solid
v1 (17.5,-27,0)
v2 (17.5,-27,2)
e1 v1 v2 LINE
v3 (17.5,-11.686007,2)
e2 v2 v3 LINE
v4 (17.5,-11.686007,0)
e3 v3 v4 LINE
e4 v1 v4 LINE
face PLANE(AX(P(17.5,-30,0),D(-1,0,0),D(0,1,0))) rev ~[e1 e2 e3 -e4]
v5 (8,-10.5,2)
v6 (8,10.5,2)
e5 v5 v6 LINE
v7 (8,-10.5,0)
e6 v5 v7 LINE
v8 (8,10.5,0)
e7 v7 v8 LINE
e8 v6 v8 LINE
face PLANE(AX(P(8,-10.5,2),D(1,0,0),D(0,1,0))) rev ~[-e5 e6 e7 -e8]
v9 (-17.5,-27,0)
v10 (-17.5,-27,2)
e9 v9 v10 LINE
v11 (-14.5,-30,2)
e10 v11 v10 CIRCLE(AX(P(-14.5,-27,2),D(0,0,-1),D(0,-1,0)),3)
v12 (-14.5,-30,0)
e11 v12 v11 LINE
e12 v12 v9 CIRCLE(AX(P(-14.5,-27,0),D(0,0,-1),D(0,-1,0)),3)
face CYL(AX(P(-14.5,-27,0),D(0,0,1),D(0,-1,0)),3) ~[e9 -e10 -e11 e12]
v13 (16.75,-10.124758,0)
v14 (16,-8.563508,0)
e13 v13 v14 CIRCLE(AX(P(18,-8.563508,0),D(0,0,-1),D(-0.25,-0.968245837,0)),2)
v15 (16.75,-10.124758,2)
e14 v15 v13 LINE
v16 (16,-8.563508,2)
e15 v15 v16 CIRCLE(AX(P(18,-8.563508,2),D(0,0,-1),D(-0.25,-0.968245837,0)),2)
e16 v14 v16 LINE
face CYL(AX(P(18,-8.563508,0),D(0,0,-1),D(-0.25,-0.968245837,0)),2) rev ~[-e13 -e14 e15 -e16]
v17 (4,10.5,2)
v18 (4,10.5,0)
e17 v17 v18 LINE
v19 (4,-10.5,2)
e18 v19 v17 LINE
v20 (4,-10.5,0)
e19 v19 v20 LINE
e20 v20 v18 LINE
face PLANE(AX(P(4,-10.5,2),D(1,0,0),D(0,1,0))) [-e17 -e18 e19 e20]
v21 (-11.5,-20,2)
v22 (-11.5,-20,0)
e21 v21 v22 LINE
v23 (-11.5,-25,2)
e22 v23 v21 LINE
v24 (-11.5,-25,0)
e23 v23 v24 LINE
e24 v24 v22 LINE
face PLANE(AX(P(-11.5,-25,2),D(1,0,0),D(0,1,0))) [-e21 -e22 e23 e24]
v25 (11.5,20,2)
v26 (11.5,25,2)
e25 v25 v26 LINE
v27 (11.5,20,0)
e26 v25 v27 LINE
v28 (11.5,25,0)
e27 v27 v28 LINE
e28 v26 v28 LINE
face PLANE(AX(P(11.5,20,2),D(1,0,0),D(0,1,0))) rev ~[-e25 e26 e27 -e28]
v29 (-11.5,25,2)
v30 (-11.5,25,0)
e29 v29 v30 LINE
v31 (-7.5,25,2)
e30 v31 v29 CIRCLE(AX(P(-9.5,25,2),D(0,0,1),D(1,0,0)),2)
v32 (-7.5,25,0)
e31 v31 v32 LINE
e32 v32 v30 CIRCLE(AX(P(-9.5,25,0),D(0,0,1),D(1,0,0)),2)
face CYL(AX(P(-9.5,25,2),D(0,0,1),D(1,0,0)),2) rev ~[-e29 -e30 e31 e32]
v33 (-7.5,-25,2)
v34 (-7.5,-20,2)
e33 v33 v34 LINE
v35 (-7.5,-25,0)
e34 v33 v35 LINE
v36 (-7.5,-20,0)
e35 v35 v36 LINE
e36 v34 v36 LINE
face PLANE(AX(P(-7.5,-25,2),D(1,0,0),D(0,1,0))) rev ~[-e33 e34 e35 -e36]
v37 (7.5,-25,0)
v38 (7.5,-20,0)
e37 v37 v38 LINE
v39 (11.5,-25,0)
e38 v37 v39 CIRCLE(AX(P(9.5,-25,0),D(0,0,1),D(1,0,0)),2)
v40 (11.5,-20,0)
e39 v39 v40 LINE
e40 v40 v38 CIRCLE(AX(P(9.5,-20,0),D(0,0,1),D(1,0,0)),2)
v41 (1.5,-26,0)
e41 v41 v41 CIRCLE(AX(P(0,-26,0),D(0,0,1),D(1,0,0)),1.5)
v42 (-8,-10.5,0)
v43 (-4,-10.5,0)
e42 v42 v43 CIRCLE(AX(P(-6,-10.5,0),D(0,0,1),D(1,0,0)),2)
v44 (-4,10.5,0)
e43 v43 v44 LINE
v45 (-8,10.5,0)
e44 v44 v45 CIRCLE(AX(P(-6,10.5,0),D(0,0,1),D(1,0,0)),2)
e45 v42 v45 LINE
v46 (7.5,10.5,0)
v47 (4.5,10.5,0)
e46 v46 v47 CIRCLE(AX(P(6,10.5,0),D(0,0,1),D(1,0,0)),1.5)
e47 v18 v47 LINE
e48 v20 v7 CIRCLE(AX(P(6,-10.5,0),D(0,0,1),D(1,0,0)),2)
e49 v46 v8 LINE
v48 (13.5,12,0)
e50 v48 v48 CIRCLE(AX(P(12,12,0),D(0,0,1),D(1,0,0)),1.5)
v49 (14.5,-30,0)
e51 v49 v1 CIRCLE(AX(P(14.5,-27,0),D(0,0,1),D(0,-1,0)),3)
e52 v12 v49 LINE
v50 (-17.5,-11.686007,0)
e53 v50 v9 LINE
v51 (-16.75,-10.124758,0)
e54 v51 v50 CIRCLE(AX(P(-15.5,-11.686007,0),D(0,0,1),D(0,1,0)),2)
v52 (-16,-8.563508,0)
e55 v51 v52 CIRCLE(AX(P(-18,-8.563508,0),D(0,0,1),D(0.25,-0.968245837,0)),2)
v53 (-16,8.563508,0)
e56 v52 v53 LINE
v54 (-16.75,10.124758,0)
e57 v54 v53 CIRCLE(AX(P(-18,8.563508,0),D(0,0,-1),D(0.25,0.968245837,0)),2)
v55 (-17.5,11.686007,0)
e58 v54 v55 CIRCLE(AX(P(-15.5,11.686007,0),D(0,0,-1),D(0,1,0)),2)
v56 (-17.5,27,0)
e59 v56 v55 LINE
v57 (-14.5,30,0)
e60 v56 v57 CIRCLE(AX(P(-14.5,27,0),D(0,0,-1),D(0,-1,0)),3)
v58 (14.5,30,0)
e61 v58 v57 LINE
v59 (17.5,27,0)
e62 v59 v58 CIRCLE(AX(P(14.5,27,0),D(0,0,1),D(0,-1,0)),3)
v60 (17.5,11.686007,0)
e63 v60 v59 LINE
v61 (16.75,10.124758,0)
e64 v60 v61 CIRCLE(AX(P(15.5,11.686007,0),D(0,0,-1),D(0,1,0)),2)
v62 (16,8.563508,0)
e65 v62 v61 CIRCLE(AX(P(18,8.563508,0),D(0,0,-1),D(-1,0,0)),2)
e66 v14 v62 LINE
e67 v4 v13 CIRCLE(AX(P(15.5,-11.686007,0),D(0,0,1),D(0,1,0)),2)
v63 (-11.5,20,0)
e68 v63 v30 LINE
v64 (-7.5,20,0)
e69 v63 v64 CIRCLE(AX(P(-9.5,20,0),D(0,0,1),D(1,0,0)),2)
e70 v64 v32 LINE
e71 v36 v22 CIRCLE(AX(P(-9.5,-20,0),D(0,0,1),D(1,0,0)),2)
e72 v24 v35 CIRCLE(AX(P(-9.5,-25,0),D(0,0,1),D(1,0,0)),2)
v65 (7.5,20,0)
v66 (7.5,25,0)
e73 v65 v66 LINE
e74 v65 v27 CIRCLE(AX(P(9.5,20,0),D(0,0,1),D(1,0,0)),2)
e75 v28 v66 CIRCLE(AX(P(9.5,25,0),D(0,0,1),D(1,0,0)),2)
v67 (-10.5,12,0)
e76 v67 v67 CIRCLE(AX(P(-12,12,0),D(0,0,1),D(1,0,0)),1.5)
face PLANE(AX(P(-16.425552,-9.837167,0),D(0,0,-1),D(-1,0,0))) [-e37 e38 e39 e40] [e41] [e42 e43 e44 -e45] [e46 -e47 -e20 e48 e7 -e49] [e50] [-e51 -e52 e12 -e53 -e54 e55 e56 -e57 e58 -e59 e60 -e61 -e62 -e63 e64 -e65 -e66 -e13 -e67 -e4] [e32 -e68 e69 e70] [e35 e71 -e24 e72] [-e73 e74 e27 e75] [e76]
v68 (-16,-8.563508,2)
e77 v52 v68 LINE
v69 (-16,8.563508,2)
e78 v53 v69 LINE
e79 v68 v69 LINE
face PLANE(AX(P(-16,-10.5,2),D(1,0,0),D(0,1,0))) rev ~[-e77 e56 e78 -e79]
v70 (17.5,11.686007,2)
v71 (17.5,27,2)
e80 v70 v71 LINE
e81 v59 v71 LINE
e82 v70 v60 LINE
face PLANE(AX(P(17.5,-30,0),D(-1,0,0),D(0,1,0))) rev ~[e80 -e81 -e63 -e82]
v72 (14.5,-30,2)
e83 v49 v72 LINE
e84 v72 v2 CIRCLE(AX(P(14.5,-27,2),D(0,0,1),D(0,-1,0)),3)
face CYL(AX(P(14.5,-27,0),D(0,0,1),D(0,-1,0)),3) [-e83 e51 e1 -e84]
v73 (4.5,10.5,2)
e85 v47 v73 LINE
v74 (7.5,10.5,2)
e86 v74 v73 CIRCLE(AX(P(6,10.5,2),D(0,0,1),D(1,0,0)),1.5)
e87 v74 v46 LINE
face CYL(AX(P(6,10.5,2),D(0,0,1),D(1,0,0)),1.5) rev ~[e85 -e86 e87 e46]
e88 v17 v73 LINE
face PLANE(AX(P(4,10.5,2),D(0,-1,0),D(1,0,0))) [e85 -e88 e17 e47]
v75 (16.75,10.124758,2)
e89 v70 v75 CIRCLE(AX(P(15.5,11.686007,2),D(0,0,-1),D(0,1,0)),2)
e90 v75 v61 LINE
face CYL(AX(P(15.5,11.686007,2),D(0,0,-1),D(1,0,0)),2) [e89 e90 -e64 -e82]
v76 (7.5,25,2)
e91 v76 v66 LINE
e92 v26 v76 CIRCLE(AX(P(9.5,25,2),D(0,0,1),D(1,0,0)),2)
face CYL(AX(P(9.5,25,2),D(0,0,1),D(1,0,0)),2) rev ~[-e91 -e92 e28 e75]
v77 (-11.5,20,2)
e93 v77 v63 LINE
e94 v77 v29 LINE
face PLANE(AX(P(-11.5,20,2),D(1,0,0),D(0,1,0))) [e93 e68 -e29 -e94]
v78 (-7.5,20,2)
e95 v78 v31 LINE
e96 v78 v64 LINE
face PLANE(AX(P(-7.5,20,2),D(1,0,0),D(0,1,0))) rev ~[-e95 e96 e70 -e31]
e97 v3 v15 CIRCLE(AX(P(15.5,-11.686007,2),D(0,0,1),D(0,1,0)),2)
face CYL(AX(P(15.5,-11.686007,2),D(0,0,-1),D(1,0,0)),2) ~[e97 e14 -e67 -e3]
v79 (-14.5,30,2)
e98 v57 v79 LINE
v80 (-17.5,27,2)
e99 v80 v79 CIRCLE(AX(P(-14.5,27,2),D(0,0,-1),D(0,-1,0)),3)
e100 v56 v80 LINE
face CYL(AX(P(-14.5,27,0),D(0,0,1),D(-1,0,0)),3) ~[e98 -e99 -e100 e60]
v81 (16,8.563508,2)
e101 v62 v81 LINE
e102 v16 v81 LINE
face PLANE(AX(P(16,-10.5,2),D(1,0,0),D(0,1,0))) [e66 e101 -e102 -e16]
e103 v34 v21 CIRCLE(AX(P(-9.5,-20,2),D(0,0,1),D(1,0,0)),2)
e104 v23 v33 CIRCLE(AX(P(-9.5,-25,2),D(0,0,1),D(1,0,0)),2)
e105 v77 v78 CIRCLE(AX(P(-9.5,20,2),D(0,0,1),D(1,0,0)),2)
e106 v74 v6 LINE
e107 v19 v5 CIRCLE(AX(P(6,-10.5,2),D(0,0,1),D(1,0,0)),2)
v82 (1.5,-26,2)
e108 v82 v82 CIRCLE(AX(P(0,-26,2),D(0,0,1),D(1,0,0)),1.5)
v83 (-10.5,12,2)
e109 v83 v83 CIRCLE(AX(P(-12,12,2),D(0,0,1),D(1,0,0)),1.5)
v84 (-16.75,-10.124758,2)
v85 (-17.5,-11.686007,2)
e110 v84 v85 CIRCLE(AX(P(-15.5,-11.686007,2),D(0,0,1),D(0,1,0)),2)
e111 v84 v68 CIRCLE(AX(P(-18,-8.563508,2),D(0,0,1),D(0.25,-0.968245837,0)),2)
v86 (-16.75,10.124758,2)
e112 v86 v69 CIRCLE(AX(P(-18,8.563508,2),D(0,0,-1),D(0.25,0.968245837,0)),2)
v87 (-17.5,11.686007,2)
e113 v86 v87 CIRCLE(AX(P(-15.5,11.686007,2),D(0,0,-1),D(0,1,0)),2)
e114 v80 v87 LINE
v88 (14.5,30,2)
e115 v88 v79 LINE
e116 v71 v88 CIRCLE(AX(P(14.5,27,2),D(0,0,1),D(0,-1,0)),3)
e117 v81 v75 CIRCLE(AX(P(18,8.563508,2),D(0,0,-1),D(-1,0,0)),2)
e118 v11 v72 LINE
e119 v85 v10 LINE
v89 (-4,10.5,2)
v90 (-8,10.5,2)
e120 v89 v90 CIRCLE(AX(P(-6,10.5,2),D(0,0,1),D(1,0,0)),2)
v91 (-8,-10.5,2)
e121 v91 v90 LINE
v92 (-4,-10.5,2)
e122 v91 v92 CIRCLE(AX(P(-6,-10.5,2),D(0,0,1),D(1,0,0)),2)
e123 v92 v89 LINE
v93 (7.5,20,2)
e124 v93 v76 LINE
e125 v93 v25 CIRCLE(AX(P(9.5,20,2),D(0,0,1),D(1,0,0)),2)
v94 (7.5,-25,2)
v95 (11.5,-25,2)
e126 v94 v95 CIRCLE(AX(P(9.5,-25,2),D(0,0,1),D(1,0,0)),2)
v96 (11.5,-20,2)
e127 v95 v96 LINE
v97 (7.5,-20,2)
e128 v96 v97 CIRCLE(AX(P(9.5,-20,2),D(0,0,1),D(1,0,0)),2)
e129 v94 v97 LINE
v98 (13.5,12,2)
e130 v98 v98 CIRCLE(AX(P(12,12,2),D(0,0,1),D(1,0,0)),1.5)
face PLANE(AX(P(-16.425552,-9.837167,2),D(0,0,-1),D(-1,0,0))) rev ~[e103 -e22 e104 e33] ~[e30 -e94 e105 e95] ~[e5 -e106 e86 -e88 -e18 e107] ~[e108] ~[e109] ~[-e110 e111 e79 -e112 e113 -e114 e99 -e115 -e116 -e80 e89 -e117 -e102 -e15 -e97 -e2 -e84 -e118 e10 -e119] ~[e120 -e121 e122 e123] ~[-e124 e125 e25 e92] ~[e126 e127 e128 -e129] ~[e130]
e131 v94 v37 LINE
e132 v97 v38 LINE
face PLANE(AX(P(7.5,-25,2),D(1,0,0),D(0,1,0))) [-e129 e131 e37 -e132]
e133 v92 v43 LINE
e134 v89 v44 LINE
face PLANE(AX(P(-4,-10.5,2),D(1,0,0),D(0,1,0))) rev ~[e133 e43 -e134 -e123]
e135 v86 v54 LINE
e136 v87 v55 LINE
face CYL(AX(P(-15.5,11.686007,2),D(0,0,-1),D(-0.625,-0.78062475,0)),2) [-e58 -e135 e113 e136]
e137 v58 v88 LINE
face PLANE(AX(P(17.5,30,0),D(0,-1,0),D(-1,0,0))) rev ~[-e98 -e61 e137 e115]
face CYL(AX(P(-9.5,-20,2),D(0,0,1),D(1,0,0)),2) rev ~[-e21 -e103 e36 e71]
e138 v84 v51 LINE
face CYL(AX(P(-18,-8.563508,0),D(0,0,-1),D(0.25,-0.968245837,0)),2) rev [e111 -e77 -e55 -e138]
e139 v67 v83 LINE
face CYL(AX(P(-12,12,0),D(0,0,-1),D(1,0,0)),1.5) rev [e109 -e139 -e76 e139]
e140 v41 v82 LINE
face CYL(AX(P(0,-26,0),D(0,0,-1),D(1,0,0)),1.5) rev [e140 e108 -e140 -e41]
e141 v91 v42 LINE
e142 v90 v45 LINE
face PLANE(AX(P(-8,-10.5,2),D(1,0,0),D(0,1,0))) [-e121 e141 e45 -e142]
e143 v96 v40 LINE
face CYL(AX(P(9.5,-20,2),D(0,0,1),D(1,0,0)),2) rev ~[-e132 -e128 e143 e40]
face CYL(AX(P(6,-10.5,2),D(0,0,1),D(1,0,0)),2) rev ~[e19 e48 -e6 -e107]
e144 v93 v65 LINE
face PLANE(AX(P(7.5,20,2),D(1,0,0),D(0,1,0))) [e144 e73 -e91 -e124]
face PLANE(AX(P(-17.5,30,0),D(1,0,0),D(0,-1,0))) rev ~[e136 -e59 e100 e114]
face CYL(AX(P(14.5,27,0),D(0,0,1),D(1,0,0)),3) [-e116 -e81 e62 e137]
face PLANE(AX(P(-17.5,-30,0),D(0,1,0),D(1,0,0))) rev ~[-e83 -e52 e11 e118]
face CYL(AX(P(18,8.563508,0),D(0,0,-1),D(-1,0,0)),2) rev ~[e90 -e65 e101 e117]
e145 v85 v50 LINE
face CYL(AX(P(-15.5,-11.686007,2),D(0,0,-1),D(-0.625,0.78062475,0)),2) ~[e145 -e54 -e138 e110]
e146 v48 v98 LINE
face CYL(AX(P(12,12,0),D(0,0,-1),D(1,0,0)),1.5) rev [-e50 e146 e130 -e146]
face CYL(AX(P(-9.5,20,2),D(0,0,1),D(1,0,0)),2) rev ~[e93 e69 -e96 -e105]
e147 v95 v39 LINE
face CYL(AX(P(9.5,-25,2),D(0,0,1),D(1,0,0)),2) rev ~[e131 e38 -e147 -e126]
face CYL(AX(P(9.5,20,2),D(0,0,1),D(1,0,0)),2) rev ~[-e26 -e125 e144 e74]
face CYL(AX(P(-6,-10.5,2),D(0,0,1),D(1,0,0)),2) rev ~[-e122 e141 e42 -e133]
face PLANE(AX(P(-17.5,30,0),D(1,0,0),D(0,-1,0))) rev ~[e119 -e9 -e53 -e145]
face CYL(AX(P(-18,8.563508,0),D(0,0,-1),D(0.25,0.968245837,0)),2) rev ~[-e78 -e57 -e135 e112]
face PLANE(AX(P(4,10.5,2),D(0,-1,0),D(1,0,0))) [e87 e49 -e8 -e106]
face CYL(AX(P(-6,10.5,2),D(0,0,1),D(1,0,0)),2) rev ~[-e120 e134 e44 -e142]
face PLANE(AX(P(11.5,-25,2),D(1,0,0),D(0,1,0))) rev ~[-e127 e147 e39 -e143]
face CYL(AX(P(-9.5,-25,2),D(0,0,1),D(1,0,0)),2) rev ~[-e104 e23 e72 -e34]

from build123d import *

# Parameters (mm, degrees)
F0_R        = 1.5
F1_DEPTH    = 2
F2_R        = 3
F3_W        = 4
F3_H        = 5
F3_W_2      = 1.5
F3_H_2      = 21
F4_DEPTH    = 2.001
F5_R        = 2
F5_R_2      = 1.5
F6_DEPTH    = 2.001
F7_T1_DEPTH = 2
F8_R        = 2


# Not quite as in the source:
# - a fillet or chamfer that OpenCascade refuses, or shapes differently, is made with other operations: its cross-section is extruded or revolved along the edge and cut away or added


with BuildPart() as f1:
    # F0 (on Top) → F1 (new body)
    with BuildSketch(Plane.XY):
        Polygon((-17.5, 17.5), (-17.5, -17.5), (-17.5, -30), (17.5, -30), (17.5, -17.5), (17.5, 17.5), (17.5, 30), (-17.5, 30), align=None)
        with Locations((0, -26)):
            Circle(F0_R, mode=Mode.SUBTRACT)
        with Locations((-12, 12)):
            Circle(F0_R, mode=Mode.SUBTRACT)
        with Locations((12, 12)):
            Circle(F0_R, mode=Mode.SUBTRACT)
    extrude(amount=F1_DEPTH)

    # F2
    f2_edges = [f1.edges().sort_by_distance(p)[0] for p in [
        (-17.5, -30, 1),
        (17.5, -30, 1),
        (17.5, 30, 1),
        (-17.5, 30, 1),
    ]]
    fillet(f2_edges, radius=F2_R)

    # F3 (on face) → F4 (cut, through all)
    with BuildSketch(Plane.XY.offset(2)):
        with Locations((9.5, 22.5)):
            Rectangle(F3_W, F3_H)
        with Locations((9.5, -22.5)):
            Rectangle(F3_W, F3_H)
        with Locations((-9.5, -22.5)):
            Rectangle(F3_W, F3_H)
        with Locations((-9.5, 22.5)):
            Rectangle(F3_W, F3_H)
        with Locations((-16.75, 0)):
            Rectangle(F3_W_2, F3_H_2)
        with Locations((16.75, 0)):
            Rectangle(F3_W_2, F3_H_2)
        with Locations((-6, 0)):
            Rectangle(F3_W, F3_H_2)
        with Locations((6, 0)):
            Rectangle(F3_W, F3_H_2)
    extrude(amount=-F4_DEPTH, mode=Mode.SUBTRACT)

    # F5 (on face) → F6 (cut, through all)
    with BuildSketch(Plane.XY.offset(2)):
        with Locations((-9.5, 25)):
            Circle(F5_R)
        with Locations((9.5, 25)):
            Circle(F5_R)
        with Locations((9.5, -25)):
            Circle(F5_R)
        with Locations((-9.5, -25)):
            Circle(F5_R)
        with Locations((-9.5, -20)):
            Circle(F5_R)
        with Locations((9.5, -20)):
            Circle(F5_R)
        with Locations((6, -10.5)):
            Circle(F5_R)
        with Locations((-6, -10.5)):
            Circle(F5_R)
        with Locations((-6, 10.5)):
            Circle(F5_R)
        with Locations((6, 10.5)):
            Circle(F5_R_2)
        with Locations((9.5, 20)):
            Circle(F5_R)
        with Locations((-9.5, 20)):
            Circle(F5_R)
    extrude(amount=-F6_DEPTH, mode=Mode.SUBTRACT)

    # F7: fillet of radius 2 on 4 edges, made by hand

    # F7_s2 → F7_t1 (join)
    with BuildSketch(Plane.XY):
        with BuildLine():
            ThreePointArc((-17.5, -10.5), (-16.4188611699, -9.7882531983), (-16, -8.5635083269))
            Line((-16, -8.5635083269), (-16, -10.5))
            Line((-16, -10.5), (-17.5, -10.5))
        make_face()
        with BuildLine():
            ThreePointArc((-17.5, 10.5), (-16.4188611699, 9.7882531983), (-16, 8.5635083269))
            Line((-16, 8.5635083269), (-16, 10.5))
            Line((-16, 10.5), (-17.5, 10.5))
        make_face()
        with BuildLine():
            ThreePointArc((16, 8.5635083269), (16.4188611699, 9.7882531983), (17.5, 10.5))
            Line((17.5, 10.5), (16, 10.5))
            Line((16, 10.5), (16, 8.5635083269))
        make_face()
        with BuildLine():
            ThreePointArc((17.5, -10.5), (16.4188611699, -9.7882531983), (16, -8.5635083269))
            Line((16, -8.5635083269), (16, -10.5))
            Line((16, -10.5), (17.5, -10.5))
        make_face()
    extrude(amount=F7_T1_DEPTH)

    # F8
    f8_edges = [f1.edges().sort_by_distance(p)[0] for p in [
        (17.5, -10.5, 1),
        (17.5, 10.5, 1),
        (-17.5, -10.5, 1),
        (-17.5, 10.5, 1),
    ]]
    fillet(f8_edges, radius=F8_R)


solid = f1.part
